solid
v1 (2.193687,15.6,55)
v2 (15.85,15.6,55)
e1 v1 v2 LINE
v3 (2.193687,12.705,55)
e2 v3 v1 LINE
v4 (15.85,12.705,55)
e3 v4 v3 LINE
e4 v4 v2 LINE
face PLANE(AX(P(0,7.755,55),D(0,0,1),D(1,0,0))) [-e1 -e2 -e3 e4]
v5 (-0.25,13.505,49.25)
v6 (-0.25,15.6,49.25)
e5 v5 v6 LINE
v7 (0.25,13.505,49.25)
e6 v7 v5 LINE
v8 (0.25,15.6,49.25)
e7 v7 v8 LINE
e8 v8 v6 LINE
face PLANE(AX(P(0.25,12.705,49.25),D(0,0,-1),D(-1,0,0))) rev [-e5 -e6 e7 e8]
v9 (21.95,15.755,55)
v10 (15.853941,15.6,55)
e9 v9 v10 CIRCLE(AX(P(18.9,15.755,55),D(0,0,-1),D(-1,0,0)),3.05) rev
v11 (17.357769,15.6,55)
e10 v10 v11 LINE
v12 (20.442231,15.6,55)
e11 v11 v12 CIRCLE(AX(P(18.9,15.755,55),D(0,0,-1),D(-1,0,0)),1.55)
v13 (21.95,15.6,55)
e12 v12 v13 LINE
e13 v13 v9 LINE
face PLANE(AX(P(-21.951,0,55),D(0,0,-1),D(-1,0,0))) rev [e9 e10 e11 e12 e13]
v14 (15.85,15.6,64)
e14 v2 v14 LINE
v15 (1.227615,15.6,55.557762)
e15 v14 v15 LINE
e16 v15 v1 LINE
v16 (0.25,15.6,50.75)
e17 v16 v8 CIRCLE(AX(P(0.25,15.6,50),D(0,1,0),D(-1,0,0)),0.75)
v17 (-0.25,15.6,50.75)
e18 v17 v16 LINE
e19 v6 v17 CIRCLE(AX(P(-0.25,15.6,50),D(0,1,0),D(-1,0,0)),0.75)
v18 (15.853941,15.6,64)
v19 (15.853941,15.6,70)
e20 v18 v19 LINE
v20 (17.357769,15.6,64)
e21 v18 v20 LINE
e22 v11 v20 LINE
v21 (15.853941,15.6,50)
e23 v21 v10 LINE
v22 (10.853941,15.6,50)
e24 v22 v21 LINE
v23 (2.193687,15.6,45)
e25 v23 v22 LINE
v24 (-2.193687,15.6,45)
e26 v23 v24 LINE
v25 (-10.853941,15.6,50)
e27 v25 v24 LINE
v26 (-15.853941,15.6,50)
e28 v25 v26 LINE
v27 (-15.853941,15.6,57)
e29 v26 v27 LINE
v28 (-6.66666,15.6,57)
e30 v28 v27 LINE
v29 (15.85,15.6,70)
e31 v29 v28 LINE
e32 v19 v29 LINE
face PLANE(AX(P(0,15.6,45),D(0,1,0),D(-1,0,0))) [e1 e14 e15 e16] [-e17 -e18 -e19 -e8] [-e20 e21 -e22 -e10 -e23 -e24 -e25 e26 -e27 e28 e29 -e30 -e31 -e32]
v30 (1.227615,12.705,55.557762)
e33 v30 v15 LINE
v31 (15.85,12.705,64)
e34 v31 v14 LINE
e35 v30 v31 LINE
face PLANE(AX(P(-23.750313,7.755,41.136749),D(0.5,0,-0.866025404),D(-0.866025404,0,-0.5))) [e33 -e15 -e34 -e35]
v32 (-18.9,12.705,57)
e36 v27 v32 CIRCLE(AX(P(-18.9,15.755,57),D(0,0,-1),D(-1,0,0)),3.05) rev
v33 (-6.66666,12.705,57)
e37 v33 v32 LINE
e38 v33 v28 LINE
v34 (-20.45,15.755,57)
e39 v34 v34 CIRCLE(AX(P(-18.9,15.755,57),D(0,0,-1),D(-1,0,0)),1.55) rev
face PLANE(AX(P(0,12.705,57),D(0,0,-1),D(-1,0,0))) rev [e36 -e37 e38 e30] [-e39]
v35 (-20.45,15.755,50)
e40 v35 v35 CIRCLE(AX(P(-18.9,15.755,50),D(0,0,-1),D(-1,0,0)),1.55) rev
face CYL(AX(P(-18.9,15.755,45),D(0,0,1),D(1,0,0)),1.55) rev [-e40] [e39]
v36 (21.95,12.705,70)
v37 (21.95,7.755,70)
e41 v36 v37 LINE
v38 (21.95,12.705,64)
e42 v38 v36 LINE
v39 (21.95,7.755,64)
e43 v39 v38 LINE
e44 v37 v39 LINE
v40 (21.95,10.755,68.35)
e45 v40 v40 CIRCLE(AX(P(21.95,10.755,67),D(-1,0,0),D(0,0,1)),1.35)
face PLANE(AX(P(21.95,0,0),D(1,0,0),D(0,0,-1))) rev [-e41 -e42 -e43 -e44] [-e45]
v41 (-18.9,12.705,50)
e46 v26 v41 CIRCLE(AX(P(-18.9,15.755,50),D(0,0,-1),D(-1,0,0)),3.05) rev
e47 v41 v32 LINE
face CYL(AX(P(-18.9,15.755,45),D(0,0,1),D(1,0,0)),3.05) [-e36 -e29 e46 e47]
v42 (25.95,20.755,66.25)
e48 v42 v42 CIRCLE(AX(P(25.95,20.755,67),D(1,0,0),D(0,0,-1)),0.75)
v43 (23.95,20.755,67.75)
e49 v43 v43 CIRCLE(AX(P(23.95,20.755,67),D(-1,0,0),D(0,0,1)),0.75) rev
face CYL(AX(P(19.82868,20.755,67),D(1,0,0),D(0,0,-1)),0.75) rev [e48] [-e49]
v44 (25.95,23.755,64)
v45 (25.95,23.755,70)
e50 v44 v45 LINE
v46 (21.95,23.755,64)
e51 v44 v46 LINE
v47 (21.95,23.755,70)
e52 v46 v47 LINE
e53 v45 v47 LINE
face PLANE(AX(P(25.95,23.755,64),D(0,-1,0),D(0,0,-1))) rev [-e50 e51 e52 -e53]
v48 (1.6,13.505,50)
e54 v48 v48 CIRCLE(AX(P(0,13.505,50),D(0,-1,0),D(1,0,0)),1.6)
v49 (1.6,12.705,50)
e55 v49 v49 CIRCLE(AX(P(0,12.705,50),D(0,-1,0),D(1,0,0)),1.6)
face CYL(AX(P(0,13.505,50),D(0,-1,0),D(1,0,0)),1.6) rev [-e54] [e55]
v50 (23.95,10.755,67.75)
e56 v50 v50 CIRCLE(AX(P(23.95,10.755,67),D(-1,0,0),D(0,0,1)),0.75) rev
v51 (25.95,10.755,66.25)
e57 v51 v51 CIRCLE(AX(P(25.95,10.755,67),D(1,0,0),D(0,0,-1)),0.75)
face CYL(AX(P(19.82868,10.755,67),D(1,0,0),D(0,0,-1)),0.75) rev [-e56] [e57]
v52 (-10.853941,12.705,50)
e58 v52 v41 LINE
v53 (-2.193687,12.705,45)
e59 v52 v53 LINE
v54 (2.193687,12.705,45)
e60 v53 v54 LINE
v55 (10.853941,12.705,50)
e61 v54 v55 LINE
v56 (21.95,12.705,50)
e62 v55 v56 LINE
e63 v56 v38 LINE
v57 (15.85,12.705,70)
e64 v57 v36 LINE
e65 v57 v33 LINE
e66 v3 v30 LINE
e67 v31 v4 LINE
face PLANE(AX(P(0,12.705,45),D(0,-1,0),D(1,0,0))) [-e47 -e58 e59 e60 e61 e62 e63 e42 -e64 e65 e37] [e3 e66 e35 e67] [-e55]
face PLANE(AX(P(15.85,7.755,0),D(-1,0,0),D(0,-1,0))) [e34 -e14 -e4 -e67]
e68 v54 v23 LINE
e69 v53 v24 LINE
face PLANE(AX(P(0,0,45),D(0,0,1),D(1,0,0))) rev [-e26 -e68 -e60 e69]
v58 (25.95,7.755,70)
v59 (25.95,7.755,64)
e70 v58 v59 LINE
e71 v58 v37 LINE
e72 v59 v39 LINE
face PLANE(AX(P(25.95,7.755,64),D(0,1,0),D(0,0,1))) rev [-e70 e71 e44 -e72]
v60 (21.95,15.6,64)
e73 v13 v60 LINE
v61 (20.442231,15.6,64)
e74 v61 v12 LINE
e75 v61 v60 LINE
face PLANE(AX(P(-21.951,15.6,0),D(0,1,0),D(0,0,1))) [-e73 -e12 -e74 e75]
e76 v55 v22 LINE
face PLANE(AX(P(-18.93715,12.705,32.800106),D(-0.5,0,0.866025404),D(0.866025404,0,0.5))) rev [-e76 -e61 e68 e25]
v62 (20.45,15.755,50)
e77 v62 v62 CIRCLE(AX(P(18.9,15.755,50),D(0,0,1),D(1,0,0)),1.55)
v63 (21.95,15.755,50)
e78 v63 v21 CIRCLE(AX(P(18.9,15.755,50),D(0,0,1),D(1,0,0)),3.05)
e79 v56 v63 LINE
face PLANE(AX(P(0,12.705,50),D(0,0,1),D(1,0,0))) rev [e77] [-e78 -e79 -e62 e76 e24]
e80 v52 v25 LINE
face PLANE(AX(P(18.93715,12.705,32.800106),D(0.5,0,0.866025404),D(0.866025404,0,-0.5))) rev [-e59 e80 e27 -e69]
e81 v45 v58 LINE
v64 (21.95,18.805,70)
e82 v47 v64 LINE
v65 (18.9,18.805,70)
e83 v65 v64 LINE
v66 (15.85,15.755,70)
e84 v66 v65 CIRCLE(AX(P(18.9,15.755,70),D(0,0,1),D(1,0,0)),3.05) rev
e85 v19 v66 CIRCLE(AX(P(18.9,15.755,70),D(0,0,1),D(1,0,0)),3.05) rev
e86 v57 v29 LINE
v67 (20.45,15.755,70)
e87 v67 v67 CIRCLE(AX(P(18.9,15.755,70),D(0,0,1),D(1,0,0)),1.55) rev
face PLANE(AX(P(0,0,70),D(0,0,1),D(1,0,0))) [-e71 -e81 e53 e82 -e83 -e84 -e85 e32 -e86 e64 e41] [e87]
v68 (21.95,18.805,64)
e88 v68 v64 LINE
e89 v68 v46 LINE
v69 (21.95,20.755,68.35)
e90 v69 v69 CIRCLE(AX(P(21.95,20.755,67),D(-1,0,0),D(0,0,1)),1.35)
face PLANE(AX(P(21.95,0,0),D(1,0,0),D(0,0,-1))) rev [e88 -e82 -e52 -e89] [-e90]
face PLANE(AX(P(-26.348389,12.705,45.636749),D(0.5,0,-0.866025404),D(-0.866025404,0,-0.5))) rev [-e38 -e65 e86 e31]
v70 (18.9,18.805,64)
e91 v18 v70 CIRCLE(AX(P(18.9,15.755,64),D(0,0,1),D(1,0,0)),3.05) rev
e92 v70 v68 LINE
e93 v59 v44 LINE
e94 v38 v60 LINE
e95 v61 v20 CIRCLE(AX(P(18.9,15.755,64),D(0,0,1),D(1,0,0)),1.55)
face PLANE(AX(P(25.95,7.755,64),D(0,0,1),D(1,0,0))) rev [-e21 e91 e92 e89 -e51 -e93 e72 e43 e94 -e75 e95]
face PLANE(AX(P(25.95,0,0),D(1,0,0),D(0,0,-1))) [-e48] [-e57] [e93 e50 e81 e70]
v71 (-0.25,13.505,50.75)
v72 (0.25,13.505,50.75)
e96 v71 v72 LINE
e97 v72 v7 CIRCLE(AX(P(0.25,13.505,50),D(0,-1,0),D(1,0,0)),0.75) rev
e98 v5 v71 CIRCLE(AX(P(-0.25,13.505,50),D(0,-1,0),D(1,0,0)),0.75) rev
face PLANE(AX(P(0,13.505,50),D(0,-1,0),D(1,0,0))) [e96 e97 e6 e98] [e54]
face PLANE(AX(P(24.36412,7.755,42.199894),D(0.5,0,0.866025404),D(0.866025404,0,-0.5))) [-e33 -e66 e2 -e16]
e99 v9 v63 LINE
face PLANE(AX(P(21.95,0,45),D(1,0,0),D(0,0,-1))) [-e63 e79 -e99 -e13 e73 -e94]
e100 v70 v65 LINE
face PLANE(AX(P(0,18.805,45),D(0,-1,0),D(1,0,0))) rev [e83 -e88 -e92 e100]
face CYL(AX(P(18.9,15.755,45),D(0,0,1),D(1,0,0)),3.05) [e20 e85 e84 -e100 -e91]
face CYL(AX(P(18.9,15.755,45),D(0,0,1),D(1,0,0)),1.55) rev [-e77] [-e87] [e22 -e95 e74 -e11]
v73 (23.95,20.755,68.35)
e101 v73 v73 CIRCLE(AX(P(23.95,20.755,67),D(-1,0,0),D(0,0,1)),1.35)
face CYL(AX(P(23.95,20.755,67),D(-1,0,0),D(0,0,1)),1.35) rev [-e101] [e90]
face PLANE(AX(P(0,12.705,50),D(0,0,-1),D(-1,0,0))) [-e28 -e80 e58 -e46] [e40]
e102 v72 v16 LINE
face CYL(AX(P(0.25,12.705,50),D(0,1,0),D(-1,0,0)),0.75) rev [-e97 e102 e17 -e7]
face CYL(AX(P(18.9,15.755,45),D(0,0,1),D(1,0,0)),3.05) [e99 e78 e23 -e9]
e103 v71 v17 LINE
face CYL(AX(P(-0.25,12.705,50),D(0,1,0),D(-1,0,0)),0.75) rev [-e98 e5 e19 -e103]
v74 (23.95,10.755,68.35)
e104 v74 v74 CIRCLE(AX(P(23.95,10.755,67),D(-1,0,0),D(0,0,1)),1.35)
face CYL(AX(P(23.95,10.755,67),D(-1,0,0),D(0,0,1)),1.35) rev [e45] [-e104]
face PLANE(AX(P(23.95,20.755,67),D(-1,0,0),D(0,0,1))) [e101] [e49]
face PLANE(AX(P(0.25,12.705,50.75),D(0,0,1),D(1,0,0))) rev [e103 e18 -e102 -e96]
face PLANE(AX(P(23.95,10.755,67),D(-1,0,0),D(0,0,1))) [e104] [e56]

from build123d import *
from build123d.topology import SkipClean

# Parameters (mm, degrees)
SKETCH_2_R           = 3.05
SKETCH_2_R_2         = 1.55
EXTRUDE_1_DEPTH      = 25
CUT_EXTRUDE_3_DEPTH  = 74.430746455
SKETCH_8_R           = 1.6
CUT_EXTRUDE_4_DEPTH  = 0.8
CUT_EXTRUDE_START    = -2.895
CUT_EXTRUDE_10_DEPTH = 6.1
SKETCH_21_W          = 6
SKETCH_21_H          = 16
EXTRUDE_9_DEPTH      = 4
SKETCH_22_R          = 0.75
CUT_EXTRUDE_16_DEPTH = 4
CUT_EXTRUDE_19_DEPTH = 76.099311082
CUT_EXTRUDE_21_REACH = 87.974
SKETCH_25_W          = 9
SKETCH_25_H          = 3.205
CUT_EXTRUDE_22_REACH = 42.469
SKETCH_27_R          = 1.35
CUT_EXTRUDE_23_DEPTH = 2


# Read off the part's stored shape, not the designer's step: 切除-拉伸10
with BuildPart() as part:
    # 草图2 → 凸台-拉伸1 (new body)
    # profile 1 of 8: a face of its own
    with SkipClean():  # the faces are left unmerged after this step: merging them gives an invalid solid
        with BuildSketch(Plane.XY.offset(70)):
            with Locations((-18.9, 15.755)):
                Circle(SKETCH_2_R)
            with Locations((-18.9, 15.755)):
                Circle(SKETCH_2_R_2, mode=Mode.SUBTRACT)
        # profile 2 of 8: a face of its own
        with BuildSketch(Plane.XY.offset(70)):
            with BuildLine():
                Line((0, 12.705), (0, 15.6))
                Line((0, 15.6), (-15.853941071, 15.6))
                ThreePointArc((-15.853941071, 15.6), (-16.798839606, 13.544202633), (-18.9, 12.705))
                Line((-18.9, 12.705), (0, 12.705))
            make_face()
        # profile 3 of 8: a face of its own
        with BuildSketch(Plane.XY.offset(70)):
            with BuildLine():
                Line((15.853941071, 15.6), (0, 15.6))
                Line((0, 15.6), (0, 12.705))
                Line((0, 12.705), (18.9, 12.705))
                ThreePointArc((18.9, 12.705), (16.798839606, 13.544202633), (15.853941071, 15.6))
            make_face()
        # profile 4 of 8: a face of its own
        with BuildSketch(Plane.XY.offset(70)):
            with Locations((18.9, 15.755)):
                Circle(SKETCH_2_R)
            with Locations((18.9, 15.755)):
                Circle(SKETCH_2_R_2, mode=Mode.SUBTRACT)
        # profile 5 of 8: a face of its own
        with BuildSketch(Plane.XY.offset(70)):
            with BuildLine():
                Line((21.95, 18.805), (18.9, 18.805))
                ThreePointArc((18.9, 18.805), (21.056675683, 17.911675683), (21.95, 15.755))
                Line((21.95, 15.755), (21.95, 18.805))
            make_face()
        # profile 6 of 8: a face of its own
        with BuildSketch(Plane.XY.offset(70)):
            with BuildLine():
                ThreePointArc((18.9, 18.805), (16.689202633, 17.856160394), (15.853941071, 15.6))
                ThreePointArc((15.853941071, 15.6), (16.798839606, 13.544202633), (18.9, 12.705))
                Line((18.9, 12.705), (18.9, 14.205))
                ThreePointArc((18.9, 14.205), (17.35, 15.755), (18.9, 17.305))
                Line((18.9, 17.305), (18.9, 18.805))
            make_face()
        # profile 7 of 8: a face of its own
        with BuildSketch(Plane.XY.offset(70)):
            with BuildLine():
                Line((18.9, 14.205), (18.9, 12.705))
                ThreePointArc((18.9, 12.705), (21.056675683, 13.598324317), (21.95, 15.755))
                ThreePointArc((21.95, 15.755), (21.056675683, 17.911675683), (18.9, 18.805))
                Line((18.9, 18.805), (18.9, 17.305))
                ThreePointArc((18.9, 17.305), (19.996015511, 16.851015511), (20.45, 15.755))
                ThreePointArc((20.45, 15.755), (19.996015511, 14.658984489), (18.9, 14.205))
            make_face()
        # profile 8 of 8: a face of its own
        with BuildSketch(Plane.XY.offset(70)):
            with BuildLine():
                ThreePointArc((21.95, 15.755), (21.056675683, 13.598324317), (18.9, 12.705))
                Line((18.9, 12.705), (21.95, 12.705))
                Line((21.95, 12.705), (21.95, 15.755))
            make_face()
        extrude(amount=-EXTRUDE_1_DEPTH)

    # 草图7 → 切除-拉伸3 (cut, through all)
    with SkipClean():  # the faces are left unmerged after this step: merging them gives an invalid solid
        with BuildSketch(Plane(origin=(0, 15.6, 0), x_dir=(1, 0, 0), z_dir=(0, 1, 0))):
            with BuildLine():
                Line((0.25, -50.75), (-0.25, -50.75))
                ThreePointArc((-0.25, -50.75), (-1, -50), (-0.25, -49.25))
                Line((-0.25, -49.25), (0.25, -49.25))
                ThreePointArc((0.25, -49.25), (1, -50), (0.25, -50.75))
            make_face()
        extrude(amount=-CUT_EXTRUDE_3_DEPTH, mode=Mode.SUBTRACT)

    # 草图8 → 切除-拉伸4 (cut)
    with SkipClean():  # the faces are left unmerged after this step: merging them gives an invalid solid
        with BuildSketch(Plane.XZ.offset(-12.705)):
            with Locations((0, 50)):
                Circle(SKETCH_8_R)
        extrude(amount=-CUT_EXTRUDE_4_DEPTH, mode=Mode.SUBTRACT)

    # 切除-拉伸10 outline → 切除-拉伸10 (cut)
    with SkipClean():  # the faces are left unmerged after this step: merging them gives an invalid solid
        with BuildSketch(Plane(origin=(0, 15.6, 0), x_dir=(1, 0, 0), z_dir=(0, 1, 0)).offset(CUT_EXTRUDE_START)):
            Polygon((-6.666660498, -57), (-21.95, -57), (-21.95, -70), (15.85, -70), align=None)
            Polygon((-21.95, -50), (-10.853941071, -50), (-2.193687033, -45), (-21.95, -45), align=None)
            Polygon((10.853941071, -50), (21.95, -50), (21.95, -45), (2.193687033, -45), align=None)
        extrude(amount=CUT_EXTRUDE_10_DEPTH, mode=Mode.SUBTRACT)

    # 草图21 → 凸台-拉伸9 (add)
    with SkipClean():  # the faces are left unmerged after this step: merging them gives an invalid solid
        with BuildSketch(Plane(origin=(21.95, 0, 0), x_dir=(0, 0, -1), z_dir=(1, 0, 0))):
            with Locations((-67, 15.755)):
                Rectangle(SKETCH_21_W, SKETCH_21_H)
        extrude(amount=EXTRUDE_9_DEPTH)

    # 草图22 → 切除-拉伸16 (cut)
    with SkipClean():  # the faces are left unmerged after this step: merging them gives an invalid solid
        with BuildSketch(Plane(origin=(25.95, 0, 0), x_dir=(0, 0, -1), z_dir=(1, 0, 0))):
            with Locations((-67, 20.755)):
                Circle(SKETCH_22_R)
            with Locations((-67, 10.755)):
                Circle(SKETCH_22_R)
        extrude(amount=-CUT_EXTRUDE_16_DEPTH, mode=Mode.SUBTRACT)

    # 草图23 → 切除-拉伸19 (cut, through all)
    with SkipClean():  # the faces are left unmerged after this step: merging them gives an invalid solid
        with BuildSketch(Plane(origin=(0, 15.6, 0), x_dir=(1, 0, 0), z_dir=(0, 1, 0))):
            Polygon((1.227614882, -55.557762016), (15.85, -64), (15.85, -55), (2.193687033, -55), align=None)
        extrude(amount=-CUT_EXTRUDE_19_DEPTH, mode=Mode.SUBTRACT)

    # 草图25 → 切除-拉伸21 (cut, up to next)
    with BuildSketch(Plane(origin=(21.95, 0, 0), x_dir=(0, 0, -1), z_dir=(1, 0, 0)), mode=Mode.PRIVATE) as cut_extrude_21_sk1:
        with Locations((-59.5, 17.2025)):
            Rectangle(SKETCH_25_W, SKETCH_25_H)
    cut_extrude_21_tool1 = extrude(cut_extrude_21_sk1.sketch, amount=-CUT_EXTRUDE_21_REACH, mode=Mode.PRIVATE) & part.part
    add(cut_extrude_21_tool1.solids().sort_by_distance((21.95, 17.2025, 59.5))[0], mode=Mode.SUBTRACT)

    # 草图26 → 切除-拉伸22 (cut, up to next)
    with BuildSketch(Plane(origin=(0, 0, 50), x_dir=(-1, 0, 0), z_dir=(0, 0, -1)), mode=Mode.PRIVATE) as cut_extrude_22_sk1:
        with BuildLine():
            ThreePointArc((-21.95, 15.755), (-21.056675683, 17.911675683), (-18.9, 18.805))
            Line((-18.9, 18.805), (-21.95, 18.805))
            Line((-21.95, 18.805), (-21.95, 15.755))
        make_face()
    cut_extrude_22_tool1 = extrude(cut_extrude_22_sk1.sketch, amount=-CUT_EXTRUDE_22_REACH, mode=Mode.PRIVATE) & part.part
    add(cut_extrude_22_tool1.solids().sort_by_distance((21.268728, 18.123728, 50))[0], mode=Mode.SUBTRACT)

    # 草图27 → 切除-拉伸23 (cut)
    with SkipClean():  # the faces are left unmerged after this step: merging them gives an invalid solid
        with BuildSketch(Plane.ZY.offset(-21.95)):
            with Locations((67, 20.755)):
                Circle(SKETCH_27_R)
            with Locations((67, 10.755)):
                Circle(SKETCH_27_R)
        extrude(amount=-CUT_EXTRUDE_23_DEPTH, mode=Mode.SUBTRACT)


solid = part.part
